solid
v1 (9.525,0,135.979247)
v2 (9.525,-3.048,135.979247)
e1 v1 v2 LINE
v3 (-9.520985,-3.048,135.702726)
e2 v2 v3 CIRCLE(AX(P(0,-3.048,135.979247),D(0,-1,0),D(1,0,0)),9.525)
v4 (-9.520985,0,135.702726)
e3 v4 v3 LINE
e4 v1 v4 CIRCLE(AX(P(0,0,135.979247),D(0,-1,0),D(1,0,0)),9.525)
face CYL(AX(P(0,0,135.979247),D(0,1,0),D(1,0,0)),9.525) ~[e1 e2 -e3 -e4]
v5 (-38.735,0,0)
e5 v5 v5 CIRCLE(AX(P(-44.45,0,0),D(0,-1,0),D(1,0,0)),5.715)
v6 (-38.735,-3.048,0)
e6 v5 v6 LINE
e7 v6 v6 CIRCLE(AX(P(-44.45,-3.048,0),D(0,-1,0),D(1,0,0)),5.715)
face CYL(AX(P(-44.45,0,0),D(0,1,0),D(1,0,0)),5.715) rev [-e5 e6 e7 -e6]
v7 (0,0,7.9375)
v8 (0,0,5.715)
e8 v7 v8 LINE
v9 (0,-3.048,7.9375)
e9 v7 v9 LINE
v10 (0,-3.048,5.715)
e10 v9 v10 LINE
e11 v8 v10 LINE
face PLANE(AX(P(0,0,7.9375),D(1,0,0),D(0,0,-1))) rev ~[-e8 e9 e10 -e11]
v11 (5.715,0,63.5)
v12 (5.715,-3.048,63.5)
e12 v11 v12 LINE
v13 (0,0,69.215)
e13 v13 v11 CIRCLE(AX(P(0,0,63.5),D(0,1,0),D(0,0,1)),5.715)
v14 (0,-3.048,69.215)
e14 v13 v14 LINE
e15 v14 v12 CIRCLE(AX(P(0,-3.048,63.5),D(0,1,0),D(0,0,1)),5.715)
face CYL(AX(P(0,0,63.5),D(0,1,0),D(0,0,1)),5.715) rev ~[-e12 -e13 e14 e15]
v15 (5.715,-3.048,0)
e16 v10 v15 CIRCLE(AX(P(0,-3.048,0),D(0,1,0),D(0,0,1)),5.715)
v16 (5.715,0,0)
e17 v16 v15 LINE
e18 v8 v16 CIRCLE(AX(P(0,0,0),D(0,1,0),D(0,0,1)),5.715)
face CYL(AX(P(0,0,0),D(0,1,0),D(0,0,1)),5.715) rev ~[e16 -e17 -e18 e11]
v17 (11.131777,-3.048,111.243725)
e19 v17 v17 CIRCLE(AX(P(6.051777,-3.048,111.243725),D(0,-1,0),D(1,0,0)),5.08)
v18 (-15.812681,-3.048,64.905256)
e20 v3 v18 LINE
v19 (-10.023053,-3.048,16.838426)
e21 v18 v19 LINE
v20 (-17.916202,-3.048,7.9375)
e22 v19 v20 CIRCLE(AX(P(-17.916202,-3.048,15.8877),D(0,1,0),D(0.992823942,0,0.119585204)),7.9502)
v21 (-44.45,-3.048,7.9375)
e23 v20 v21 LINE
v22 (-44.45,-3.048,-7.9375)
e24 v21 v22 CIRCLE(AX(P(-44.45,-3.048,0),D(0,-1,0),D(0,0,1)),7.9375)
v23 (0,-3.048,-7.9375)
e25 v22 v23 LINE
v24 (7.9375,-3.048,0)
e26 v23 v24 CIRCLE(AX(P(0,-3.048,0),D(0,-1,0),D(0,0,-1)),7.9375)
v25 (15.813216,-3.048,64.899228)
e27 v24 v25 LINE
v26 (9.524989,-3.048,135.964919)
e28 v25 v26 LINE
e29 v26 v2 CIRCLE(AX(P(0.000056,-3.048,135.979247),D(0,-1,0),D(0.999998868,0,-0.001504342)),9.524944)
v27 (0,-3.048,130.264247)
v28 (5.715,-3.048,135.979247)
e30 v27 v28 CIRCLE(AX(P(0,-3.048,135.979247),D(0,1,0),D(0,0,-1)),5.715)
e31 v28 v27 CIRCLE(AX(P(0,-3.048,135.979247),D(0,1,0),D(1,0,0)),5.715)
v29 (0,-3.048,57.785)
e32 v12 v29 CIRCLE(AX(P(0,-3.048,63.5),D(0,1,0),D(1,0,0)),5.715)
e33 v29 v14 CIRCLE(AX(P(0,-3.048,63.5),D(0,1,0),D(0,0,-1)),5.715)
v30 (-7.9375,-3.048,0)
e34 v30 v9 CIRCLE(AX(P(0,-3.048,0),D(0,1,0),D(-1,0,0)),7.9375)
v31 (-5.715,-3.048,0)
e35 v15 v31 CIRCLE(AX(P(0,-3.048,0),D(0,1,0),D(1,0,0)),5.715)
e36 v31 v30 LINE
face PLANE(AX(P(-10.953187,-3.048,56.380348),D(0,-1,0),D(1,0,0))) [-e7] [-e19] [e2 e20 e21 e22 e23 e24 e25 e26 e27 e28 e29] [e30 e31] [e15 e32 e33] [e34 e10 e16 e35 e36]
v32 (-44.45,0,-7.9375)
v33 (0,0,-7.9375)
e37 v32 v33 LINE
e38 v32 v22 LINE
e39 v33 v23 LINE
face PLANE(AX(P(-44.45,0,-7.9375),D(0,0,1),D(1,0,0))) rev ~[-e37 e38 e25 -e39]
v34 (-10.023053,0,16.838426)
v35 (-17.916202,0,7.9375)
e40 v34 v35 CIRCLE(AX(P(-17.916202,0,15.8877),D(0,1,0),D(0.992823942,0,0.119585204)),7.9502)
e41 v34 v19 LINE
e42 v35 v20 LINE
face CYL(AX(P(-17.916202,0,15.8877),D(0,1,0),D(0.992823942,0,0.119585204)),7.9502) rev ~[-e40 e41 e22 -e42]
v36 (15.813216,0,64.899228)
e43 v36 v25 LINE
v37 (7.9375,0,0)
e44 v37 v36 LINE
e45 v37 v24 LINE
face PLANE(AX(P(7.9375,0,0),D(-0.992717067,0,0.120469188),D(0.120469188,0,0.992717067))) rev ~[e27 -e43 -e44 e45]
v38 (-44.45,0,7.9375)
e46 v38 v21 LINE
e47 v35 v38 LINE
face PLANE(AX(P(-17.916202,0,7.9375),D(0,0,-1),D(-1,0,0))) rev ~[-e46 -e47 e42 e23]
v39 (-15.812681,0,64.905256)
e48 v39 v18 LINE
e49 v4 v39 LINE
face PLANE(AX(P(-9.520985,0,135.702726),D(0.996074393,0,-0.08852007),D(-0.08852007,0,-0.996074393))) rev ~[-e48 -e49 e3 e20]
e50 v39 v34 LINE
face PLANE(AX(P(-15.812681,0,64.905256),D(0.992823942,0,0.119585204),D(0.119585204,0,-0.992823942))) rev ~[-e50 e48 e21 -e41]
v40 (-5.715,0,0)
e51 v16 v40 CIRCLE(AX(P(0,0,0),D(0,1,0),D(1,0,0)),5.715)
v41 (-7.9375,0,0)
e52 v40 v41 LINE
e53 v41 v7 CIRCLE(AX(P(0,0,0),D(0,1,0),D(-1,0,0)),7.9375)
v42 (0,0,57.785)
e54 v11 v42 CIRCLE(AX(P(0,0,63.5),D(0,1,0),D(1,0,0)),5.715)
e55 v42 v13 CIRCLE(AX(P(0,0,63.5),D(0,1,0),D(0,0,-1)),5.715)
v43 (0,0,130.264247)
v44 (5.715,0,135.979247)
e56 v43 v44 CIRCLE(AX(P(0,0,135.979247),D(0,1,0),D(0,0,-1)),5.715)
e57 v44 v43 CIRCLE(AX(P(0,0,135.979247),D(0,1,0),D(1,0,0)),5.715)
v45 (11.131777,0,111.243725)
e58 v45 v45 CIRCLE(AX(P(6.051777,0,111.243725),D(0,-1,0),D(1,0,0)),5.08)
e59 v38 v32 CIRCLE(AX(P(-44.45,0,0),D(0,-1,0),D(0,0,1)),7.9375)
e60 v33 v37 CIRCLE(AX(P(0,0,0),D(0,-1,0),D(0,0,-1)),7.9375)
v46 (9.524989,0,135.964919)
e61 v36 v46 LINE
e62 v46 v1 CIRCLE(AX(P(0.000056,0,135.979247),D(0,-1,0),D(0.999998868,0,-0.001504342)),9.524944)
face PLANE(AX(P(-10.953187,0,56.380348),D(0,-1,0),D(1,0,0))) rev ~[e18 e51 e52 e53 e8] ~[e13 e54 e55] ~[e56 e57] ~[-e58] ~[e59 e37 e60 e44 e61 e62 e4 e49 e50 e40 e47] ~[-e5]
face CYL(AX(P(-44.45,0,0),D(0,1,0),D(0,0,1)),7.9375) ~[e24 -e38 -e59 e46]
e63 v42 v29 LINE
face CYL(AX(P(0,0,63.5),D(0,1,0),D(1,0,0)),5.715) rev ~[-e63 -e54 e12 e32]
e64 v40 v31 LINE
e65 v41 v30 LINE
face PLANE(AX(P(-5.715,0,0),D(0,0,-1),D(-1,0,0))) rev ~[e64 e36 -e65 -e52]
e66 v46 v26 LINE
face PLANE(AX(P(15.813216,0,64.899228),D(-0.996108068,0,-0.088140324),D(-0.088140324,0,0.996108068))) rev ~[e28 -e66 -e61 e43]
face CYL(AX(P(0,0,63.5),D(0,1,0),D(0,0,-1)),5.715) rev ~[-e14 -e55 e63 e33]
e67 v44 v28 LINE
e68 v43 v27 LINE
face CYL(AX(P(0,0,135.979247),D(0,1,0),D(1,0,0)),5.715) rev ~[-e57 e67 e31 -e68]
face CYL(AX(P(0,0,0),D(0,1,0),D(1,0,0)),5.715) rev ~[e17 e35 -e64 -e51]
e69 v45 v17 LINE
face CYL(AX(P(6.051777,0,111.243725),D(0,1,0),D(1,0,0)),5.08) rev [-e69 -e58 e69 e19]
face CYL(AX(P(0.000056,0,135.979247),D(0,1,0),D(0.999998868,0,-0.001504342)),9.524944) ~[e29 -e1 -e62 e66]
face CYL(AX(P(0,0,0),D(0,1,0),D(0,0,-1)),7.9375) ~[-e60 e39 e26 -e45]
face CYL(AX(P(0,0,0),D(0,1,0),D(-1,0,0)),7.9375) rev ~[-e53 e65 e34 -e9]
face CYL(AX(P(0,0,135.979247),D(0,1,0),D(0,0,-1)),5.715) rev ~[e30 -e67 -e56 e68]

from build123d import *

# Parameters (mm, degrees)
F0_R     = 5.08
F0_R_2   = 5.715
F1_DEPTH = 3.048


# Not quite as in the source:
# - a feature of the source that left no trace in its solid (it failed there, or was rolled back) is left out


with BuildPart() as f1:
    # F0 (on Front) → F1 (new body)
    with BuildSketch(Plane.XZ):
        with BuildLine():
            ThreePointArc((0, 57.785), (-5.715, 63.5), (0, 69.215))
            Line((0, 69.215), (0, 126.4542473564))
            ThreePointArc((0, 126.4542473564), (-6.6367069731, 129.1469896364), (-9.5209852919, 135.7027259805))
            Line((-9.5209852919, 135.7027259805), (-15.8126809955, 64.9052561096))
            Line((-15.8126809955, 64.9052561096), (-10.0230526485, 16.8384262865))
            ThreePointArc((-10.0230526485, 16.8384262865), (-11.9679184287, 10.6128911922), (-17.9162015492, 7.9375))
            Line((-17.9162015492, 7.9375), (-44.45, 7.9375))
            ThreePointArc((-44.45, 7.9375), (-38.8373399243, 5.6126600757), (-36.5125, 0))
            Line((-36.5125, 0), (-7.9375, 0))
            ThreePointArc((-7.9375, 0), (-5.6126600757, 5.6126600757), (0, 7.9375))
            Line((0, 7.9375), (0, 57.785))
        make_face()
        with BuildLine():
            Line((0, 126.4542473564), (0, 69.215))
            ThreePointArc((0, 69.215), (4.0411152545, 67.5411152545), (5.715, 63.5))
            ThreePointArc((5.715, 63.5), (4.0411152545, 59.4588847455), (0, 57.785))
            Line((0, 57.785), (0, 7.9375))
            ThreePointArc((0, 7.9375), (5.6126600757, 5.6126600757), (7.9375, 0))
            Line((7.9375, 0), (15.8132155809, 64.8992276415))
            Line((15.8132155809, 64.8992276415), (9.5249892223, 135.9649185116))
            ThreePointArc((9.5249892223, 135.9649185116), (6.7301241724, 129.2389911578), (0, 126.4542473564))
        make_face()
        with Locations((6.0517773964, 111.243724823)):
            Circle(F0_R, mode=Mode.SUBTRACT)
        with BuildLine():
            ThreePointArc((-9.5209852919, 135.7027259805), (-6.6367069731, 129.1469896364), (0, 126.4542473564))
            ThreePointArc((0, 126.4542473564), (6.7301241724, 129.2389911578), (9.5249892223, 135.9649185116))
            ThreePointArc((9.5249892223, 135.9649185116), (9.5249973056, 135.972082932), (9.525, 135.9792473564))
            ThreePointArc((9.525, 135.9792473564), (-0.1382752592, 145.5032436265), (-9.5209852919, 135.7027259805))
        make_face()
        with BuildLine():
            ThreePointArc((5.715, 135.9792473564), (4.0411152545, 131.9381321019), (0, 130.2642473564))
            ThreePointArc((0, 130.2642473564), (-4.0411152545, 140.0203626109), (5.715, 135.9792473564))
        make_face(mode=Mode.SUBTRACT)
        with BuildLine():
            ThreePointArc((7.9375, 0), (5.6126600757, 5.6126600757), (0, 7.9375))
            Line((0, 7.9375), (0, 5.715))
            ThreePointArc((0, 5.715), (4.0411152545, 4.0411152545), (5.715, 0))
            ThreePointArc((5.715, 0), (0, -5.715), (-5.715, 0))
            Line((-5.715, 0), (-7.9375, 0))
            ThreePointArc((-7.9375, 0), (-5.6126600757, -5.6126600757), (0, -7.9375))
            ThreePointArc((0, -7.9375), (5.6126600757, -5.6126600757), (7.9375, 0))
        make_face()
        with BuildLine():
            ThreePointArc((0, -7.9375), (-5.6126600757, -5.6126600757), (-7.9375, 0))
            Line((-7.9375, 0), (-36.5125, 0))
            ThreePointArc((-36.5125, 0), (-38.8373399243, -5.6126600757), (-44.45, -7.9375))
            Line((-44.45, -7.9375), (0, -7.9375))
        make_face()
        with BuildLine():
            ThreePointArc((-44.45, -7.9375), (-38.8373399243, -5.6126600757), (-36.5125, 0))
            ThreePointArc((-36.5125, 0), (-38.8373399243, 5.6126600757), (-44.45, 7.9375))
            ThreePointArc((-44.45, 7.9375), (-52.3875, 0), (-44.45, -7.9375))
        make_face()
        with Locations((-44.45, 0)):
            Circle(F0_R_2, mode=Mode.SUBTRACT)
    extrude(amount=F1_DEPTH)


solid = f1.part
